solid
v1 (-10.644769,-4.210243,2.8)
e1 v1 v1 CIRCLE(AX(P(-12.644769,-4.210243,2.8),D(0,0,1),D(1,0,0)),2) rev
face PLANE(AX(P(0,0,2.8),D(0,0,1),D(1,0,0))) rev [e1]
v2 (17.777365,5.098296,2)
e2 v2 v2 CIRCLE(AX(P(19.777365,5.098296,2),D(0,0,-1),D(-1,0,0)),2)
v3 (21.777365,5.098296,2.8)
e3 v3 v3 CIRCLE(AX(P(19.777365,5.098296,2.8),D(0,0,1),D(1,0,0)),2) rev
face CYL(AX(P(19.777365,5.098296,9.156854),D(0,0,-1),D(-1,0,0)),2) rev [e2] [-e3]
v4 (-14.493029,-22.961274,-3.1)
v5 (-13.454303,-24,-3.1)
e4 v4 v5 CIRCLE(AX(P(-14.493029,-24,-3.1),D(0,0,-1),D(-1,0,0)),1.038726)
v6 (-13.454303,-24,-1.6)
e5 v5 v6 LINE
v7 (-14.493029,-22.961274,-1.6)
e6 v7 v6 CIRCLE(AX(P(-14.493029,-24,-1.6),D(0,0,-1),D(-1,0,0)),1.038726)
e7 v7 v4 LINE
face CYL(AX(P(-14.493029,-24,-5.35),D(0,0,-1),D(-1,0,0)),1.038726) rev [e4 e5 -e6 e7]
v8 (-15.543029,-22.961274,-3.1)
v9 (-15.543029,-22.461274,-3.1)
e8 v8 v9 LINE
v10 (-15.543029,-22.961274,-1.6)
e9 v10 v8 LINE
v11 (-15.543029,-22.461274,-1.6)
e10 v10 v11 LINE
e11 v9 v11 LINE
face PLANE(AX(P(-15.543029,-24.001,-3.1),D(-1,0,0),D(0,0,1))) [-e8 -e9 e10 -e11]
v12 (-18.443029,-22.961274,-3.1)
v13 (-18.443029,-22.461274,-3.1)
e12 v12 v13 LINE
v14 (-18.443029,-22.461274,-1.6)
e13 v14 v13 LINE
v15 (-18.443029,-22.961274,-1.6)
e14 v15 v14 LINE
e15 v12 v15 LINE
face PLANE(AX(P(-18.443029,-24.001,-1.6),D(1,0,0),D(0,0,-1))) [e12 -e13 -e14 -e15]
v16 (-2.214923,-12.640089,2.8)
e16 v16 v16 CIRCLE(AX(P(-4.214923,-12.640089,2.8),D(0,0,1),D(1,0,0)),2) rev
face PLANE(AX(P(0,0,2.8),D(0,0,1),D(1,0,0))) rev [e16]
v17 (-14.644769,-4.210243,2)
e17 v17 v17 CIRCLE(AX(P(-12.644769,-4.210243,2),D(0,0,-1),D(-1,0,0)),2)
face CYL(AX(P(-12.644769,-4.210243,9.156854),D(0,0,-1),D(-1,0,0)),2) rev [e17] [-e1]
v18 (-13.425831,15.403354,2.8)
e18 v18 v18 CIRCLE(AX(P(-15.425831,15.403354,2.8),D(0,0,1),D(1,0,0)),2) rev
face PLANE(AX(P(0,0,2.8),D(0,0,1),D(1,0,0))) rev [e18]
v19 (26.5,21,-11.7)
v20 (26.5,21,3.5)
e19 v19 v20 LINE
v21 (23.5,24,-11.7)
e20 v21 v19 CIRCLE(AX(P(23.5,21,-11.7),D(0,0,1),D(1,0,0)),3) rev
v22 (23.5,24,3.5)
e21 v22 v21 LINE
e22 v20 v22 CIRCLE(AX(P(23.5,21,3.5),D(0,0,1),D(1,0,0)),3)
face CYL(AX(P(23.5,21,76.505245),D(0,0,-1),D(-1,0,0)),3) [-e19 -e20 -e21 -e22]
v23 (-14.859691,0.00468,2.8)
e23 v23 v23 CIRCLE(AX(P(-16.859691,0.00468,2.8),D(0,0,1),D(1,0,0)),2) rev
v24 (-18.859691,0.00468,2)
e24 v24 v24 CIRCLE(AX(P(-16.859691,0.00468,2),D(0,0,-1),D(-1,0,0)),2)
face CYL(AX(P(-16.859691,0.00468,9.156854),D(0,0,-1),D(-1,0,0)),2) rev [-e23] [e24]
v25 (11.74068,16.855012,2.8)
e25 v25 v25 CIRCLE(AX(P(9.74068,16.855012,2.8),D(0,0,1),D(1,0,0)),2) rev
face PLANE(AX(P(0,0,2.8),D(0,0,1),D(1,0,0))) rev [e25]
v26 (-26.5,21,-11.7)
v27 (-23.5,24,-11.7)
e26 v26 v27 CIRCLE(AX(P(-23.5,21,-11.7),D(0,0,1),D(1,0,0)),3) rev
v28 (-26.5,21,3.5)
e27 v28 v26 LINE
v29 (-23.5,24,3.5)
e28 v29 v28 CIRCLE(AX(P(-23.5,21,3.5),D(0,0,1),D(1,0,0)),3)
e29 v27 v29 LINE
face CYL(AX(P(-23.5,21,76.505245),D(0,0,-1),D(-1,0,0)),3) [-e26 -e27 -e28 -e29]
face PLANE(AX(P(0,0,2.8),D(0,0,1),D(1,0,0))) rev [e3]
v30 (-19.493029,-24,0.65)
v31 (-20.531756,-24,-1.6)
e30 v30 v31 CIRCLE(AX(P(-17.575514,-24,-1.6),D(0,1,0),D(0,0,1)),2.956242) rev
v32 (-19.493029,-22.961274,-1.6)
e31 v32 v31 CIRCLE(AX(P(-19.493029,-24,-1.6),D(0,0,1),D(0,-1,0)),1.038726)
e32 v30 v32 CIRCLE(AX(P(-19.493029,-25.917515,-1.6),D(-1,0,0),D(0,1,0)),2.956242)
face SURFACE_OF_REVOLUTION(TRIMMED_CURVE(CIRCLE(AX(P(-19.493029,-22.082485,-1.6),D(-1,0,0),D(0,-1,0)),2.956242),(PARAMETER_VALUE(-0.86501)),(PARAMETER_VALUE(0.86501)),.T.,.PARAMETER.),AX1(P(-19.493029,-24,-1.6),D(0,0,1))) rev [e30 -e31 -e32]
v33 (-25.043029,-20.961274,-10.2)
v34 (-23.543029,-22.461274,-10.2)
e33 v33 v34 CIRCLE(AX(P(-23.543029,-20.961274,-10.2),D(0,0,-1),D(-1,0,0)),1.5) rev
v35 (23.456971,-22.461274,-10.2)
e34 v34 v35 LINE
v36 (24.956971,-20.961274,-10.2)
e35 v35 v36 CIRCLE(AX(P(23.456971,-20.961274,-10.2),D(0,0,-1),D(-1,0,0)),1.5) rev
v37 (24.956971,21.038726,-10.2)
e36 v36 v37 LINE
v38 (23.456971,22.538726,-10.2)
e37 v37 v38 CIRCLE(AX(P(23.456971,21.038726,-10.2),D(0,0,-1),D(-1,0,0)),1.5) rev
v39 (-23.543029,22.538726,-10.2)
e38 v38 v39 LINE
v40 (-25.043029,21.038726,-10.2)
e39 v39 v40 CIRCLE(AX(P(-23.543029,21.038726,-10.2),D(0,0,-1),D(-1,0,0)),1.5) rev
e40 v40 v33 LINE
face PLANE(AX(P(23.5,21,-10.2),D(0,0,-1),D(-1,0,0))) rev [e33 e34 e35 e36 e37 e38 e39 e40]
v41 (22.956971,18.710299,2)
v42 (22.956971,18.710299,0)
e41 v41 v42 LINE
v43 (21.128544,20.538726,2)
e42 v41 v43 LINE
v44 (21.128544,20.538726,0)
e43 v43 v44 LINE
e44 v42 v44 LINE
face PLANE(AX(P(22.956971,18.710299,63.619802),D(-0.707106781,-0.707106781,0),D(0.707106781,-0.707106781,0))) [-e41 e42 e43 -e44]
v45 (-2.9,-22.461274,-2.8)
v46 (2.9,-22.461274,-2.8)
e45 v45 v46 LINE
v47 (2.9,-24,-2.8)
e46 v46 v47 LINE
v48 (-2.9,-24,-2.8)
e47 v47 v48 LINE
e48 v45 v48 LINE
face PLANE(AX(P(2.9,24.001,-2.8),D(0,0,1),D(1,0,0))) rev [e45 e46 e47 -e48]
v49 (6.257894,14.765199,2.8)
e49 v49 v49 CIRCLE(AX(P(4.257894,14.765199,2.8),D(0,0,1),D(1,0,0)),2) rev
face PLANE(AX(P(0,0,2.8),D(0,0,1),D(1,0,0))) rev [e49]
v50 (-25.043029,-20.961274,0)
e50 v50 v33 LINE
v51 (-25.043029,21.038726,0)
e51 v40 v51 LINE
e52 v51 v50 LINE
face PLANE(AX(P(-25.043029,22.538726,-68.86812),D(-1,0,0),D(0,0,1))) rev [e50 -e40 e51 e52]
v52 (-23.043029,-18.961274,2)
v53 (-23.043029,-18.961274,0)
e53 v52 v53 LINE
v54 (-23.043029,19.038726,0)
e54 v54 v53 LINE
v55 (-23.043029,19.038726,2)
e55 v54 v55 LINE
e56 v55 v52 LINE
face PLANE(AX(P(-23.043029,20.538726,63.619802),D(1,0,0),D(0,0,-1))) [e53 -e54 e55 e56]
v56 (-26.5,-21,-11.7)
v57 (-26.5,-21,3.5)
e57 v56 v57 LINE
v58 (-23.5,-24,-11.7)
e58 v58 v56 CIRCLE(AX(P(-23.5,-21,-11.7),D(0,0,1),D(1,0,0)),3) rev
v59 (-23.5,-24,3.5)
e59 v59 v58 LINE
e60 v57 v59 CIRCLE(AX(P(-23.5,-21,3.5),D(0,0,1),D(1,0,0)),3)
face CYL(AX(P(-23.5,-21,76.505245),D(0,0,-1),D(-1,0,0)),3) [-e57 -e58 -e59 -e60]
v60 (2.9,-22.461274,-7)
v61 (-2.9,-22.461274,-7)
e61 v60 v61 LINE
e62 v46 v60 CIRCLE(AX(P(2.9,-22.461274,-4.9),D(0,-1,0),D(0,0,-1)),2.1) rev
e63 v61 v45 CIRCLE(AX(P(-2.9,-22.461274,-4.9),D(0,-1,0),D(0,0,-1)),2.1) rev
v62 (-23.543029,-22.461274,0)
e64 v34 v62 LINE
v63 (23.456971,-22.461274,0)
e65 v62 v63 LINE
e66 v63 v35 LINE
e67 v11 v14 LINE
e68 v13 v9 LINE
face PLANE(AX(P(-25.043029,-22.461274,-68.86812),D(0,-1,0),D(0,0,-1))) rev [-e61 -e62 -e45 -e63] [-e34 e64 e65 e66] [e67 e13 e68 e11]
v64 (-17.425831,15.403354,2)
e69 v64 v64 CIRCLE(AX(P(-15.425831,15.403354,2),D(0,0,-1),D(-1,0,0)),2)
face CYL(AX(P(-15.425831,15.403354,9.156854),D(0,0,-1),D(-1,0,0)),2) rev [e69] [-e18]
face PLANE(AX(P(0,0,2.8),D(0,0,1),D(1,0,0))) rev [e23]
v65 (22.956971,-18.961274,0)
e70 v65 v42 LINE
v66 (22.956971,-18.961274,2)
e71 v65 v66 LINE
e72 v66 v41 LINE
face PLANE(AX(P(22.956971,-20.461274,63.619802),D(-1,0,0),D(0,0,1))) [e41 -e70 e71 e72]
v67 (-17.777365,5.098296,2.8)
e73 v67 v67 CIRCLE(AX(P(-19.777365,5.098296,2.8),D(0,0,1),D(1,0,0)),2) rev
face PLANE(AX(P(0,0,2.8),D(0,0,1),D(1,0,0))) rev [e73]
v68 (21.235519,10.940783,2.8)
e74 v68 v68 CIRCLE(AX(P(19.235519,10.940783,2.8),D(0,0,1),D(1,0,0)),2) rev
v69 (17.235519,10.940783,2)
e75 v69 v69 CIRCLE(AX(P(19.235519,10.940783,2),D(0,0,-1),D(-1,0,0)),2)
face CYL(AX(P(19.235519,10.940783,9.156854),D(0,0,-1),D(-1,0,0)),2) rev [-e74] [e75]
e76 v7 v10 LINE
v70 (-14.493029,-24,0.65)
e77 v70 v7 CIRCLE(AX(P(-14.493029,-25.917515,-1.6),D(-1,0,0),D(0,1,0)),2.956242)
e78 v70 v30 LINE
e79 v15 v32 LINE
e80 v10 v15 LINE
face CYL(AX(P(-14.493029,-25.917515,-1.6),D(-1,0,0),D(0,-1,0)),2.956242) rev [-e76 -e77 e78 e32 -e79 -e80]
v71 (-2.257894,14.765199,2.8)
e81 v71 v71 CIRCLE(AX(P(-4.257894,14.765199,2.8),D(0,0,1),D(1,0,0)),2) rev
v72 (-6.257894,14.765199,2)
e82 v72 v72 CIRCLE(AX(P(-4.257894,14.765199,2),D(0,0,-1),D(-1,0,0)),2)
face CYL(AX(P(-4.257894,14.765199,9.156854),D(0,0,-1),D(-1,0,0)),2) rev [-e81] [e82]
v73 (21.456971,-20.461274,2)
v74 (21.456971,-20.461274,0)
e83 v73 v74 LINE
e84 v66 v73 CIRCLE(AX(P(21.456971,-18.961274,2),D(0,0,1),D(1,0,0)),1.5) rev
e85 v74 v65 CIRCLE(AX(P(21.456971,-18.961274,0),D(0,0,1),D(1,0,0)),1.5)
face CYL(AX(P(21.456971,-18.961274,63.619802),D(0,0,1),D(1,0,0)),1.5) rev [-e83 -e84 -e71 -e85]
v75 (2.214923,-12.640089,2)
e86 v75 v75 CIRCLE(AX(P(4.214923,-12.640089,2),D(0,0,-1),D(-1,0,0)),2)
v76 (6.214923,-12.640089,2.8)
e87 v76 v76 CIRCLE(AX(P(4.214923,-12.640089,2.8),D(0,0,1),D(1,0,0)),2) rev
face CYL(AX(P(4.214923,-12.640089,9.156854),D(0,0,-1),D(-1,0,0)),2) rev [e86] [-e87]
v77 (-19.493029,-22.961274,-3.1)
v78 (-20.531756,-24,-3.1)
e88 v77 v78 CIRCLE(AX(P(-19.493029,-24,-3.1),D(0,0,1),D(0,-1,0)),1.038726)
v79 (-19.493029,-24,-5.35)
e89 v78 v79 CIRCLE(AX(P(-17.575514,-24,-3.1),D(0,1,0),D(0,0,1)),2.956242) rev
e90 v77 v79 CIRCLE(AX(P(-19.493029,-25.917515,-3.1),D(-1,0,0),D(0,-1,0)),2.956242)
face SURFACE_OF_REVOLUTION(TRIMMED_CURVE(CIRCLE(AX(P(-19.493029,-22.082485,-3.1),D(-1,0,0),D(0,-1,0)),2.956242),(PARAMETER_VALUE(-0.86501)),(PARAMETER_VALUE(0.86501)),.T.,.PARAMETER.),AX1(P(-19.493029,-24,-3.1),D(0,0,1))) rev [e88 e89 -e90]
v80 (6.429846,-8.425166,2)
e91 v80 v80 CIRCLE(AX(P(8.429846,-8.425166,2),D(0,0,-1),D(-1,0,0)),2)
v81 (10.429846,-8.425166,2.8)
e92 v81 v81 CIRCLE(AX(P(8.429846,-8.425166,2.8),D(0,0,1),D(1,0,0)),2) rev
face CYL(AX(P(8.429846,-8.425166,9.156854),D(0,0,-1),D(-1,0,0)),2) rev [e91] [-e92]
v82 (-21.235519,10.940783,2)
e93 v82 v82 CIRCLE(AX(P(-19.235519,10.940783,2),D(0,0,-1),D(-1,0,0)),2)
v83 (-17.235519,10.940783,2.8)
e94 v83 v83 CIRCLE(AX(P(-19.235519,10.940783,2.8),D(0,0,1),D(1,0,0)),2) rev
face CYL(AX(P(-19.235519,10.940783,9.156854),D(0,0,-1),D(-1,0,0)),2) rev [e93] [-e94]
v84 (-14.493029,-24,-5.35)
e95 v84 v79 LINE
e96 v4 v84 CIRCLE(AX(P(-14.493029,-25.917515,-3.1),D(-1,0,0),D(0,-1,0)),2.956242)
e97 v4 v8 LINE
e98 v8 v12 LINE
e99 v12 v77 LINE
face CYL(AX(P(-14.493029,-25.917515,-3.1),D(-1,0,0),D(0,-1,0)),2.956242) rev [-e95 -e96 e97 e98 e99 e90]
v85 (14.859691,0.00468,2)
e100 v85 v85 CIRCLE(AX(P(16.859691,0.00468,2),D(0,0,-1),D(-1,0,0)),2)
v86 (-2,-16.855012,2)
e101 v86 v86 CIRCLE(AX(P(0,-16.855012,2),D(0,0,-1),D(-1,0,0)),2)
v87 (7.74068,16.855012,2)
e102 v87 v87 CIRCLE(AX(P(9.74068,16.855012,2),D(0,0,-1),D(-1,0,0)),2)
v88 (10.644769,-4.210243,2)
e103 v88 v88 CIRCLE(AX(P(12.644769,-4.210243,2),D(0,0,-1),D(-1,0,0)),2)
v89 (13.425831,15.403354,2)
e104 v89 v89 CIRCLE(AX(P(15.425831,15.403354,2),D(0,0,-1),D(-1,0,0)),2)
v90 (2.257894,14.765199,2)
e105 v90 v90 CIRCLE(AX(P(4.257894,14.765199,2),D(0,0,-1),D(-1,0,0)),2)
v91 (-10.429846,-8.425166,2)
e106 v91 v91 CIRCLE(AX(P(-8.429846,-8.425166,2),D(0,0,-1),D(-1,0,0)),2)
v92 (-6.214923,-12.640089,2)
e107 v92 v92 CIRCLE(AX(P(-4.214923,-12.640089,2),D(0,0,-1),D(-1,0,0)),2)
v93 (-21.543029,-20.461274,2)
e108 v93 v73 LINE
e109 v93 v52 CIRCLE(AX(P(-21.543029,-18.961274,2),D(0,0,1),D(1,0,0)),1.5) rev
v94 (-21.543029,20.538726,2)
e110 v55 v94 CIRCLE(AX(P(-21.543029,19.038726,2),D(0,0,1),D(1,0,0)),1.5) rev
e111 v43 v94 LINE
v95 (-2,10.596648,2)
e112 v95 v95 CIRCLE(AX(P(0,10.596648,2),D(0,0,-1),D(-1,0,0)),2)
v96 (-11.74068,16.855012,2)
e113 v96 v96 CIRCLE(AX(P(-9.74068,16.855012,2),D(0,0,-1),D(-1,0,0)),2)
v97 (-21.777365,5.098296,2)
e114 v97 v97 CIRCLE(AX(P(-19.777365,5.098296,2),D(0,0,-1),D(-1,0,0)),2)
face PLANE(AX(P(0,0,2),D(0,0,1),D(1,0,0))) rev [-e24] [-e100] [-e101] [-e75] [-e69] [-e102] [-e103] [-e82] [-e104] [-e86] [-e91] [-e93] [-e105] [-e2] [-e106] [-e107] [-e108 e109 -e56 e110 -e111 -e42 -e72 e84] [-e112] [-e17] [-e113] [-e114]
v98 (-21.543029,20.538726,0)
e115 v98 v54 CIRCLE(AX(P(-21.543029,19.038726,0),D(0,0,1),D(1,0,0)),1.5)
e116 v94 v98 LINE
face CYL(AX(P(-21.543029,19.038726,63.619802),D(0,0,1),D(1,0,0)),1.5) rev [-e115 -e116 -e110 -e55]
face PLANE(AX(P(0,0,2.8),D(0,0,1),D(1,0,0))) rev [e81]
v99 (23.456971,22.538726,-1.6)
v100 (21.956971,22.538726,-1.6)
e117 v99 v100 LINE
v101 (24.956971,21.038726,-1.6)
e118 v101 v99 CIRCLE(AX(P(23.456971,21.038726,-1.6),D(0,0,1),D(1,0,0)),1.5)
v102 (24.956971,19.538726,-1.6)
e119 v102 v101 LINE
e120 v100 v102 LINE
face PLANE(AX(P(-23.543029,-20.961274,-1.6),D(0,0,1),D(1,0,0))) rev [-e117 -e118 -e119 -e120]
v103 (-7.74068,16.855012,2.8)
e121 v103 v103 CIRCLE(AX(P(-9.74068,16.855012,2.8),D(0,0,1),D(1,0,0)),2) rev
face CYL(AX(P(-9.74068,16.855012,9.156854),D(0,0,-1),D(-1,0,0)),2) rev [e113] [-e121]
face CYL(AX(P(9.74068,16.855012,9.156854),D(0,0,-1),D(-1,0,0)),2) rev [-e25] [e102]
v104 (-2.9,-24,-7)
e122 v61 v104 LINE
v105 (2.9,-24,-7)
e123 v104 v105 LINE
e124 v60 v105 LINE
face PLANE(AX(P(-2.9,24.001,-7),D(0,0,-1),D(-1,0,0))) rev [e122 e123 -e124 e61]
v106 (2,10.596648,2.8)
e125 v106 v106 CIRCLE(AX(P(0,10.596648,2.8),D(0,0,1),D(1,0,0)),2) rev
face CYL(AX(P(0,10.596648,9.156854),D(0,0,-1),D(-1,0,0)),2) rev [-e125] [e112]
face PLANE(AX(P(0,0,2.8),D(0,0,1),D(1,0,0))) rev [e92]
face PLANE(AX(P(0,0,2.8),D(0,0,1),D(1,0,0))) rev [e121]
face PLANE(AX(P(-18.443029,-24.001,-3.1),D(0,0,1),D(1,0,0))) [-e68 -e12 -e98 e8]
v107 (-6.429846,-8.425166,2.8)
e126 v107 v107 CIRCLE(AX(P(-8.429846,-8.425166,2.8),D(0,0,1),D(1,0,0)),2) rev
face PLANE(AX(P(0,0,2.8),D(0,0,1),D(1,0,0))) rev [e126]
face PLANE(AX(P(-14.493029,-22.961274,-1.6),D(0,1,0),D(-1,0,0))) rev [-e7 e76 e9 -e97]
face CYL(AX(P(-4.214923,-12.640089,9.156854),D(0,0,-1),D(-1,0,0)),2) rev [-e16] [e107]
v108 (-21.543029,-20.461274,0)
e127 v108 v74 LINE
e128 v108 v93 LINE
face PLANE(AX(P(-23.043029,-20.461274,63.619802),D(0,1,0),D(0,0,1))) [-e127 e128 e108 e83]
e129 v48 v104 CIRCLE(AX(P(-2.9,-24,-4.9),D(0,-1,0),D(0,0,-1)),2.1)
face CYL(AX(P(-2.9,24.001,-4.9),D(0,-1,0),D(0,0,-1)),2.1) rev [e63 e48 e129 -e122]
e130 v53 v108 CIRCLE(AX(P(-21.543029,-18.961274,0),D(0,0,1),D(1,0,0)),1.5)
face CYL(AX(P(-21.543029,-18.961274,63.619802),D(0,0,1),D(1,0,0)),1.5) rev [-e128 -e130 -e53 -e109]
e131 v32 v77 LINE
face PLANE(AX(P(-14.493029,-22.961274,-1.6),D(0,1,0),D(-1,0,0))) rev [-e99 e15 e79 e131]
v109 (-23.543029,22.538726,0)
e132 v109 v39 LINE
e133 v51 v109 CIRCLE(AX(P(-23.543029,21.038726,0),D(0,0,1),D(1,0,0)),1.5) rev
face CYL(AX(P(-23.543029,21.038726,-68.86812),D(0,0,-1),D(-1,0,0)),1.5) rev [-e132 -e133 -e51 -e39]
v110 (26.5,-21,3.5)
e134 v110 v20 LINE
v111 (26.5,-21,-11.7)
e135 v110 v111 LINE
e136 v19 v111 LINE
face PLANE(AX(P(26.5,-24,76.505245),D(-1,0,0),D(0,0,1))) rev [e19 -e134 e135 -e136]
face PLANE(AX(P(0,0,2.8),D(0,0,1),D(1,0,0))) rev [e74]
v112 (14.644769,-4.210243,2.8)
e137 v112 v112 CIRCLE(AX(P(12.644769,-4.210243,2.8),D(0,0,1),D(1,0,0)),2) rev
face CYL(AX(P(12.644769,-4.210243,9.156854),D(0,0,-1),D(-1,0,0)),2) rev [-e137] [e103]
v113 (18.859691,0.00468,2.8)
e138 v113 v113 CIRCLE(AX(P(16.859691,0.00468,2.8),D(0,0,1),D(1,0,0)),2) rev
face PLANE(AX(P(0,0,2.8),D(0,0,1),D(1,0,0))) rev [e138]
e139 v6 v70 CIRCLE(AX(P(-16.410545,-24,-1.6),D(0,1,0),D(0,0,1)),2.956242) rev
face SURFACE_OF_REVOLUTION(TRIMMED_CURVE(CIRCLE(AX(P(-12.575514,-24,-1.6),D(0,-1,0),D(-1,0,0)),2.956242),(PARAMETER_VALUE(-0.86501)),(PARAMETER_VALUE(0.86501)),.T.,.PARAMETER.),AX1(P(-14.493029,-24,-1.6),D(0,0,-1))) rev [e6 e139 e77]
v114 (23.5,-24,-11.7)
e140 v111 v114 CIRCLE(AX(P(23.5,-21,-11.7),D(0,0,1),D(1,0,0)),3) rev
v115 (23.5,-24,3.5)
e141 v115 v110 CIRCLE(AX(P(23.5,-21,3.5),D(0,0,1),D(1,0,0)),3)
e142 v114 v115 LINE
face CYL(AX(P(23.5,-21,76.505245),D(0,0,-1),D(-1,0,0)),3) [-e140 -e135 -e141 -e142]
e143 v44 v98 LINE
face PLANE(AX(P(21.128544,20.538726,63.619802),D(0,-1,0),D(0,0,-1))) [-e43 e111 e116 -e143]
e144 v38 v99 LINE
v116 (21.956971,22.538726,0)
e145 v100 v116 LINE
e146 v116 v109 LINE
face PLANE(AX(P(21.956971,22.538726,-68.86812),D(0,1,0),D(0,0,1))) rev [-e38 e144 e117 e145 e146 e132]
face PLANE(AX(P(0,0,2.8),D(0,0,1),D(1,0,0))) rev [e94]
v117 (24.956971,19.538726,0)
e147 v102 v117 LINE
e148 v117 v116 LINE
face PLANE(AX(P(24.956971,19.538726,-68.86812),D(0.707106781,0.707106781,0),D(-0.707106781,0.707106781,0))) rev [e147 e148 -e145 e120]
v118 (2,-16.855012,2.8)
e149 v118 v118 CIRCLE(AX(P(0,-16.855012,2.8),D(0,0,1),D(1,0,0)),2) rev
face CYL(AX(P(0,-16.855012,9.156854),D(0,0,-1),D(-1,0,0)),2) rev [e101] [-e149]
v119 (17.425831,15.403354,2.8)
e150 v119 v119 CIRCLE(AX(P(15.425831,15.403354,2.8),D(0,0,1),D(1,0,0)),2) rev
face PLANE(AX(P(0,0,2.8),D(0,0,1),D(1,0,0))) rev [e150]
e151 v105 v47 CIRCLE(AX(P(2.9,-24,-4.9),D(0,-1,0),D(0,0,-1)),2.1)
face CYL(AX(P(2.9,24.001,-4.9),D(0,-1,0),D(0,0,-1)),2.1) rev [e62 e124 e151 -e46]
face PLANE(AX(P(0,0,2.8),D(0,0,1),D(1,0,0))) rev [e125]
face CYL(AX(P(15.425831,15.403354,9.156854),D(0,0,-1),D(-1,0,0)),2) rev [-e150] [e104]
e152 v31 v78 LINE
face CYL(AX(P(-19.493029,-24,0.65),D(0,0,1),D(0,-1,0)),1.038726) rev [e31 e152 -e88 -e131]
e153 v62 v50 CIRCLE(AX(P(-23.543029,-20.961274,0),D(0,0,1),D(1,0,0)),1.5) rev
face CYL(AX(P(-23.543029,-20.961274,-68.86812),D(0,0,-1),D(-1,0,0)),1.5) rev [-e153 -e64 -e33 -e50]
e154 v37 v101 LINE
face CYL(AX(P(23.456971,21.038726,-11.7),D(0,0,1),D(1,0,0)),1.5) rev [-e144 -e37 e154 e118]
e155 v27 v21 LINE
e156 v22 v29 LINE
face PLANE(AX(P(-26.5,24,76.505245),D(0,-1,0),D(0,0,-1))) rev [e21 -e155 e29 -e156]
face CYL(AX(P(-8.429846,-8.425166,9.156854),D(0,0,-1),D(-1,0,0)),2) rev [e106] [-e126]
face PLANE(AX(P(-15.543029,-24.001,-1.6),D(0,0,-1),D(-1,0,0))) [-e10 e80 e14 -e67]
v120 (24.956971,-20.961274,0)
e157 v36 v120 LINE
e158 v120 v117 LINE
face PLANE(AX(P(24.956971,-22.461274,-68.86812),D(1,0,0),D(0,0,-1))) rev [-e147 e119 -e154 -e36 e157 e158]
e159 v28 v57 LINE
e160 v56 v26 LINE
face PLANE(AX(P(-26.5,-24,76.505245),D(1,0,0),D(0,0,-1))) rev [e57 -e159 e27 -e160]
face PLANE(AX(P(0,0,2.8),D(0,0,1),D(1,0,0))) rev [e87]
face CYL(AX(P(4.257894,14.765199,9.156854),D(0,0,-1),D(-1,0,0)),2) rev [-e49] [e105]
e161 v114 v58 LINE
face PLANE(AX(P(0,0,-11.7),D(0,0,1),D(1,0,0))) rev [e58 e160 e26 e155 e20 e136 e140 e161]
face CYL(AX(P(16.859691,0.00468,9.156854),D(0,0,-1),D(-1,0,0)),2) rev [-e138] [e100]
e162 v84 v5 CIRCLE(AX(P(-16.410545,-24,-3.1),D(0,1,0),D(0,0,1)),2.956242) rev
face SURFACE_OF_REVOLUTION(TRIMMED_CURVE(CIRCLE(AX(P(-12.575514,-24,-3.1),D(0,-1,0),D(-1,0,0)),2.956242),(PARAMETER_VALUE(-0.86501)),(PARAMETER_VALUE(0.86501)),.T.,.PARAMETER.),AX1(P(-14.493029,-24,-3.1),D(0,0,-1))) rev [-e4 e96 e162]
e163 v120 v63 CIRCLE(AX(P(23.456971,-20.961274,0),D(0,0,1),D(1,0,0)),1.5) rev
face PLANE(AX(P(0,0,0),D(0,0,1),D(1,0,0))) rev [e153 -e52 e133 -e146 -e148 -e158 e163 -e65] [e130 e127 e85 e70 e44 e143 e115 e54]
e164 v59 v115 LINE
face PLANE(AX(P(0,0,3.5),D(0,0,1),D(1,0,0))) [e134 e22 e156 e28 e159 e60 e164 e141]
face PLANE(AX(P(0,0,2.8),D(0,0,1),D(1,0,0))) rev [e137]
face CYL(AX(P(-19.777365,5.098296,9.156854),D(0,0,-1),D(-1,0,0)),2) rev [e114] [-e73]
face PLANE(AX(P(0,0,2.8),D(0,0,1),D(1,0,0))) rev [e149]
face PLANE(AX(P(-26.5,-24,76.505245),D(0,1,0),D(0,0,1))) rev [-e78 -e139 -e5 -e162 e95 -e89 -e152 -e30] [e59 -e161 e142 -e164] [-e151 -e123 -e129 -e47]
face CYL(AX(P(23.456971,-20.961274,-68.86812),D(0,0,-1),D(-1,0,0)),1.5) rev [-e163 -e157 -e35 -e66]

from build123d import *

# Parameters (mm, degrees)
EXTRUDE_1_DEPTH      = 3.5
EXTRUDE_1_DEPTH_BACK = 11.7
SKETCH_1_W           = 53
SKETCH_1_H           = 48
CUT_EXTRUDE_START    = -1.6
CUT_EXTRUDE_1_DEPTH  = 1.6
CUT_EXTRUDE_2_DEPTH  = 2
SKETCH_5_R           = 2
CUT_EXTRUDE_3_DEPTH  = 0.8
FILLET_2_R           = 1.5
FILLET_1_R           = 3
CUT_EXTRUDE_4_DEPTH  = 38.15185056
CUT_EXTRUDE_6_REACH  = 58.064
CUT_EXTRUDE_8_REACH  = 56.752
SKETCH_8_W           = 2.9
SKETCH_8_H           = 1.5
CUT_EXTRUDE_7_DEPTH  = 2.5
EXTRUDE_2_DEPTH      = 1.5


# Read off the part's stored shape, not the designer's step: 切除-旋转2
with BuildPart() as part:
    # 草图1 → 凸台-拉伸1 (new, two sides: drawn at the far end of the back side and taken through both)
    with BuildSketch(Plane.XY.offset(-EXTRUDE_1_DEPTH_BACK)):
        Rectangle(SKETCH_1_W, SKETCH_1_H)
    extrude(amount=EXTRUDE_1_DEPTH + EXTRUDE_1_DEPTH_BACK)

    # 草图2 → 切除-拉伸1 (cut)
    with BuildSketch(Plane.XY.offset(CUT_EXTRUDE_START)):
        Polygon((-25.04302926, 22.538726334), (-25.04302926, -22.461273666), (24.95697074, -22.461273666), (24.95697074, 19.538726334), (21.95697074, 22.538726334), align=None)
    extrude(amount=CUT_EXTRUDE_1_DEPTH, mode=Mode.SUBTRACT)

    # 草图3 → 切除-拉伸2 (cut)
    with BuildSketch(Plane.XY):
        Polygon((-23.04302926, 20.538726334), (-23.04302926, -20.461273666), (22.95697074, -20.461273666), (22.95697074, 18.710299209), (21.128543615, 20.538726334), align=None)
    extrude(amount=CUT_EXTRUDE_2_DEPTH, mode=Mode.SUBTRACT)

    # 草图5 → 切除-拉伸3 (cut)
    with BuildSketch(Plane(origin=(0, 0, 2), x_dir=(-1, 0, 0), z_dir=(0, 0, -1))):
        with Locations((0, 10.596648324)):
            Circle(SKETCH_5_R)
        with Locations((-4.257893586, 14.765199175)):
            Circle(SKETCH_5_R)
        with Locations((-9.74067964, 16.855011719)):
            Circle(SKETCH_5_R)
        with Locations((-15.42583133, 15.403354164)):
            Circle(SKETCH_5_R)
        with Locations((-19.235519258, 10.94078346)):
            Circle(SKETCH_5_R)
        with Locations((-19.777365172, 5.098295771)):
            Circle(SKETCH_5_R)
        with Locations((-16.859691363, 0.004679646)):
            Circle(SKETCH_5_R)
        with Locations((-12.644768522, -4.210243195)):
            Circle(SKETCH_5_R)
        with Locations((-8.429845681, -8.425166036)):
            Circle(SKETCH_5_R)
        with Locations((-4.21492284, -12.640088876)):
            Circle(SKETCH_5_R)
        with Locations((0, -16.855011717)):
            Circle(SKETCH_5_R)
        with Locations((4.21492284, -12.640088877)):
            Circle(SKETCH_5_R)
        with Locations((8.429845681, -8.425166037)):
            Circle(SKETCH_5_R)
        with Locations((12.644768522, -4.210243196)):
            Circle(SKETCH_5_R)
        with Locations((16.859691363, 0.004679645)):
            Circle(SKETCH_5_R)
        with Locations((19.777365172, 5.09829577)):
            Circle(SKETCH_5_R)
        with Locations((19.235519258, 10.940783459)):
            Circle(SKETCH_5_R)
        with Locations((15.425831331, 15.403354163)):
            Circle(SKETCH_5_R)
        with Locations((9.740679641, 16.855011718)):
            Circle(SKETCH_5_R)
        with Locations((4.257893587, 14.765199175)):
            Circle(SKETCH_5_R)
    extrude(amount=-CUT_EXTRUDE_3_DEPTH, mode=Mode.SUBTRACT)

    # 圆角2
    fillet_2_edges = [part.edges().sort_by_distance(p)[0] for p in [
        (24.95697074, -22.461273666, -0.8),
        (-25.04302926, -22.461273666, -0.8),
        (-25.04302926, 22.538726334, -0.8),
        (-23.04302926, 20.538726334, 1),
        (-23.04302926, -20.461273666, 1),
        (22.95697074, -20.461273666, 1),
    ]]
    fillet(fillet_2_edges, radius=FILLET_2_R)

    # 圆角1
    fillet_1_edges = [part.edges().sort_by_distance(p)[0] for p in [
        (26.5, 24, -4.1),
        (-26.5, 24, -4.1),
        (-26.5, -24, -4.1),
        (26.5, -24, -4.1),
    ]]
    fillet(fillet_1_edges, radius=FILLET_1_R)

    # 草图6 → 切除-拉伸4 (cut, through all)
    with BuildSketch(Plane.XY.offset(-1.6)):
        with BuildLine():
            Line((-23.54302926, -22.461273666), (23.45697074, -22.461273666))
            ThreePointArc((23.45697074, -22.461273666), (24.517630912, -22.021933838), (24.95697074, -20.961273666))
            Line((24.95697074, -20.961273666), (24.95697074, 21.038726334))
            ThreePointArc((24.95697074, 21.038726334), (24.517630912, 22.099386506), (23.45697074, 22.538726334))
            Line((23.45697074, 22.538726334), (-23.54302926, 22.538726334))
            ThreePointArc((-23.54302926, 22.538726334), (-24.603689432, 22.099386506), (-25.04302926, 21.038726334))
            Line((-25.04302926, 21.038726334), (-25.04302926, -20.961273666))
            ThreePointArc((-25.04302926, -20.961273666), (-24.603689432, -22.021933838), (-23.54302926, -22.461273666))
        make_face()
    extrude(amount=-CUT_EXTRUDE_4_DEPTH, mode=Mode.SUBTRACT)

    # 草图7 → 切除-拉伸6 (cut, up to next)
    with BuildSketch(Plane.XZ.offset(24), mode=Mode.PRIVATE) as cut_extrude_6_sk1:
        with BuildLine():
            Line((2.9, -2.8), (-2.9, -2.8))
            ThreePointArc((-2.9, -2.8), (-5, -4.9), (-2.9, -7))
            Line((-2.9, -7), (2.9, -7))
            ThreePointArc((2.9, -7), (5, -4.9), (2.9, -2.8))
        make_face()
    cut_extrude_6_tool1 = extrude(cut_extrude_6_sk1.sketch, amount=-CUT_EXTRUDE_6_REACH, mode=Mode.PRIVATE) & part.part
    add(cut_extrude_6_tool1.solids().sort_by_distance((0, -24, -4.9))[0], mode=Mode.SUBTRACT)

    # 草图8 → 切除-拉伸8 (cut, up to next)
    with BuildSketch(Plane.XZ.offset(22.461273666), mode=Mode.PRIVATE) as cut_extrude_8_sk1:
        with Locations((-16.99302926, -2.35)):
            Rectangle(SKETCH_8_W, SKETCH_8_H)
    cut_extrude_8_tool1 = extrude(cut_extrude_8_sk1.sketch, amount=CUT_EXTRUDE_8_REACH, mode=Mode.PRIVATE) & part.part
    add(cut_extrude_8_tool1.solids().sort_by_distance((-16.993029, -22.461274, -2.35))[0], mode=Mode.SUBTRACT)

    # 草图11 → 切除-拉伸7 (cut, symmetric)
    with BuildSketch(Plane.ZY.offset(16.99302926)):
        with BuildLine():
            Line((-1.6, -22.961273666), (-3.1, -22.961273666))
            ThreePointArc((-3.1, -22.961273666), (-4.339097696, -23.233488179), (-5.35, -24))
            Line((-5.35, -24), (0.65, -24))
            ThreePointArc((0.65, -24), (-0.360902304, -23.233488179), (-1.6, -22.961273666))
        make_face()
    extrude(amount=CUT_EXTRUDE_7_DEPTH, both=True, mode=Mode.SUBTRACT)

    # 草图12 → 切除-旋转1 (revolve, cut)
    with BuildSketch(Plane(origin=(-19.49302926, 0, 0), x_dir=(0, 0, -1), z_dir=(1, 0, 0))):
        with BuildLine():
            Line((-0.65, -24), (5.35, -24))
            ThreePointArc((5.35, -24), (4.339097696, -23.233488179), (3.1, -22.961273666))
            Line((3.1, -22.961273666), (1.6, -22.961273666))
            ThreePointArc((1.6, -22.961273666), (0.360902304, -23.233488179), (-0.65, -24))
        make_face()
    revolve(axis=Axis((-19.49302926, -24, 0.65), (0, 0, -1)), mode=Mode.SUBTRACT)

    # 切除-旋转2 outline → 切除-旋转2 (revolve, cut)
    with BuildSketch(Plane(origin=(-14.49302926, -24, 0), x_dir=(1, 0, 0), z_dir=(0, -1, 0))):
        with BuildLine():
            add(Edge.make_bspline(
                [(1.038726334, -3.1), (1.038726334, -4.464767199), (0, -5.35)],
                knots=[0, 0, 0, 0.865009582, 0.865009582, 0.865009582], degree=2, weights=[1, 0.907918725, 1]))
            Line((1.038726334, -3.1), (1.038726334, -1.6))
            add(Edge.make_bspline(
                [(0, 0.65), (1.038726334, -0.235232801), (1.038726334, -1.6)],
                knots=[5.418175725, 5.418175725, 5.418175725, 6.283185307, 6.283185307, 6.283185307], degree=2, weights=[1, 0.907918725, 1]))
            Line((0, 0.65), (0, -5.35))
        make_face()
    revolve(axis=Axis((-14.49302926, -24, 0), (0, 0, 1)), mode=Mode.SUBTRACT)

    # 草图14 → 凸台-拉伸2 (add)
    with BuildSketch(Plane(origin=(0, 0, -11.7), x_dir=(-1, 0, 0), z_dir=(0, 0, -1))):
        with BuildLine():
            Line((-26.5, 21), (-26.5, -21))
            ThreePointArc((-26.5, -21), (-25.621320344, -23.121320344), (-23.5, -24))
            Line((-23.5, -24), (23.5, -24))
            ThreePointArc((23.5, -24), (25.621320344, -23.121320344), (26.5, -21))
            Line((26.5, -21), (26.5, 21))
            ThreePointArc((26.5, 21), (25.621320344, 23.121320344), (23.5, 24))
            Line((23.5, 24), (-23.5, 24))
            ThreePointArc((-23.5, 24), (-25.621320344, 23.121320344), (-26.5, 21))
        make_face()
    extrude(amount=-EXTRUDE_2_DEPTH)


solid = part.part
